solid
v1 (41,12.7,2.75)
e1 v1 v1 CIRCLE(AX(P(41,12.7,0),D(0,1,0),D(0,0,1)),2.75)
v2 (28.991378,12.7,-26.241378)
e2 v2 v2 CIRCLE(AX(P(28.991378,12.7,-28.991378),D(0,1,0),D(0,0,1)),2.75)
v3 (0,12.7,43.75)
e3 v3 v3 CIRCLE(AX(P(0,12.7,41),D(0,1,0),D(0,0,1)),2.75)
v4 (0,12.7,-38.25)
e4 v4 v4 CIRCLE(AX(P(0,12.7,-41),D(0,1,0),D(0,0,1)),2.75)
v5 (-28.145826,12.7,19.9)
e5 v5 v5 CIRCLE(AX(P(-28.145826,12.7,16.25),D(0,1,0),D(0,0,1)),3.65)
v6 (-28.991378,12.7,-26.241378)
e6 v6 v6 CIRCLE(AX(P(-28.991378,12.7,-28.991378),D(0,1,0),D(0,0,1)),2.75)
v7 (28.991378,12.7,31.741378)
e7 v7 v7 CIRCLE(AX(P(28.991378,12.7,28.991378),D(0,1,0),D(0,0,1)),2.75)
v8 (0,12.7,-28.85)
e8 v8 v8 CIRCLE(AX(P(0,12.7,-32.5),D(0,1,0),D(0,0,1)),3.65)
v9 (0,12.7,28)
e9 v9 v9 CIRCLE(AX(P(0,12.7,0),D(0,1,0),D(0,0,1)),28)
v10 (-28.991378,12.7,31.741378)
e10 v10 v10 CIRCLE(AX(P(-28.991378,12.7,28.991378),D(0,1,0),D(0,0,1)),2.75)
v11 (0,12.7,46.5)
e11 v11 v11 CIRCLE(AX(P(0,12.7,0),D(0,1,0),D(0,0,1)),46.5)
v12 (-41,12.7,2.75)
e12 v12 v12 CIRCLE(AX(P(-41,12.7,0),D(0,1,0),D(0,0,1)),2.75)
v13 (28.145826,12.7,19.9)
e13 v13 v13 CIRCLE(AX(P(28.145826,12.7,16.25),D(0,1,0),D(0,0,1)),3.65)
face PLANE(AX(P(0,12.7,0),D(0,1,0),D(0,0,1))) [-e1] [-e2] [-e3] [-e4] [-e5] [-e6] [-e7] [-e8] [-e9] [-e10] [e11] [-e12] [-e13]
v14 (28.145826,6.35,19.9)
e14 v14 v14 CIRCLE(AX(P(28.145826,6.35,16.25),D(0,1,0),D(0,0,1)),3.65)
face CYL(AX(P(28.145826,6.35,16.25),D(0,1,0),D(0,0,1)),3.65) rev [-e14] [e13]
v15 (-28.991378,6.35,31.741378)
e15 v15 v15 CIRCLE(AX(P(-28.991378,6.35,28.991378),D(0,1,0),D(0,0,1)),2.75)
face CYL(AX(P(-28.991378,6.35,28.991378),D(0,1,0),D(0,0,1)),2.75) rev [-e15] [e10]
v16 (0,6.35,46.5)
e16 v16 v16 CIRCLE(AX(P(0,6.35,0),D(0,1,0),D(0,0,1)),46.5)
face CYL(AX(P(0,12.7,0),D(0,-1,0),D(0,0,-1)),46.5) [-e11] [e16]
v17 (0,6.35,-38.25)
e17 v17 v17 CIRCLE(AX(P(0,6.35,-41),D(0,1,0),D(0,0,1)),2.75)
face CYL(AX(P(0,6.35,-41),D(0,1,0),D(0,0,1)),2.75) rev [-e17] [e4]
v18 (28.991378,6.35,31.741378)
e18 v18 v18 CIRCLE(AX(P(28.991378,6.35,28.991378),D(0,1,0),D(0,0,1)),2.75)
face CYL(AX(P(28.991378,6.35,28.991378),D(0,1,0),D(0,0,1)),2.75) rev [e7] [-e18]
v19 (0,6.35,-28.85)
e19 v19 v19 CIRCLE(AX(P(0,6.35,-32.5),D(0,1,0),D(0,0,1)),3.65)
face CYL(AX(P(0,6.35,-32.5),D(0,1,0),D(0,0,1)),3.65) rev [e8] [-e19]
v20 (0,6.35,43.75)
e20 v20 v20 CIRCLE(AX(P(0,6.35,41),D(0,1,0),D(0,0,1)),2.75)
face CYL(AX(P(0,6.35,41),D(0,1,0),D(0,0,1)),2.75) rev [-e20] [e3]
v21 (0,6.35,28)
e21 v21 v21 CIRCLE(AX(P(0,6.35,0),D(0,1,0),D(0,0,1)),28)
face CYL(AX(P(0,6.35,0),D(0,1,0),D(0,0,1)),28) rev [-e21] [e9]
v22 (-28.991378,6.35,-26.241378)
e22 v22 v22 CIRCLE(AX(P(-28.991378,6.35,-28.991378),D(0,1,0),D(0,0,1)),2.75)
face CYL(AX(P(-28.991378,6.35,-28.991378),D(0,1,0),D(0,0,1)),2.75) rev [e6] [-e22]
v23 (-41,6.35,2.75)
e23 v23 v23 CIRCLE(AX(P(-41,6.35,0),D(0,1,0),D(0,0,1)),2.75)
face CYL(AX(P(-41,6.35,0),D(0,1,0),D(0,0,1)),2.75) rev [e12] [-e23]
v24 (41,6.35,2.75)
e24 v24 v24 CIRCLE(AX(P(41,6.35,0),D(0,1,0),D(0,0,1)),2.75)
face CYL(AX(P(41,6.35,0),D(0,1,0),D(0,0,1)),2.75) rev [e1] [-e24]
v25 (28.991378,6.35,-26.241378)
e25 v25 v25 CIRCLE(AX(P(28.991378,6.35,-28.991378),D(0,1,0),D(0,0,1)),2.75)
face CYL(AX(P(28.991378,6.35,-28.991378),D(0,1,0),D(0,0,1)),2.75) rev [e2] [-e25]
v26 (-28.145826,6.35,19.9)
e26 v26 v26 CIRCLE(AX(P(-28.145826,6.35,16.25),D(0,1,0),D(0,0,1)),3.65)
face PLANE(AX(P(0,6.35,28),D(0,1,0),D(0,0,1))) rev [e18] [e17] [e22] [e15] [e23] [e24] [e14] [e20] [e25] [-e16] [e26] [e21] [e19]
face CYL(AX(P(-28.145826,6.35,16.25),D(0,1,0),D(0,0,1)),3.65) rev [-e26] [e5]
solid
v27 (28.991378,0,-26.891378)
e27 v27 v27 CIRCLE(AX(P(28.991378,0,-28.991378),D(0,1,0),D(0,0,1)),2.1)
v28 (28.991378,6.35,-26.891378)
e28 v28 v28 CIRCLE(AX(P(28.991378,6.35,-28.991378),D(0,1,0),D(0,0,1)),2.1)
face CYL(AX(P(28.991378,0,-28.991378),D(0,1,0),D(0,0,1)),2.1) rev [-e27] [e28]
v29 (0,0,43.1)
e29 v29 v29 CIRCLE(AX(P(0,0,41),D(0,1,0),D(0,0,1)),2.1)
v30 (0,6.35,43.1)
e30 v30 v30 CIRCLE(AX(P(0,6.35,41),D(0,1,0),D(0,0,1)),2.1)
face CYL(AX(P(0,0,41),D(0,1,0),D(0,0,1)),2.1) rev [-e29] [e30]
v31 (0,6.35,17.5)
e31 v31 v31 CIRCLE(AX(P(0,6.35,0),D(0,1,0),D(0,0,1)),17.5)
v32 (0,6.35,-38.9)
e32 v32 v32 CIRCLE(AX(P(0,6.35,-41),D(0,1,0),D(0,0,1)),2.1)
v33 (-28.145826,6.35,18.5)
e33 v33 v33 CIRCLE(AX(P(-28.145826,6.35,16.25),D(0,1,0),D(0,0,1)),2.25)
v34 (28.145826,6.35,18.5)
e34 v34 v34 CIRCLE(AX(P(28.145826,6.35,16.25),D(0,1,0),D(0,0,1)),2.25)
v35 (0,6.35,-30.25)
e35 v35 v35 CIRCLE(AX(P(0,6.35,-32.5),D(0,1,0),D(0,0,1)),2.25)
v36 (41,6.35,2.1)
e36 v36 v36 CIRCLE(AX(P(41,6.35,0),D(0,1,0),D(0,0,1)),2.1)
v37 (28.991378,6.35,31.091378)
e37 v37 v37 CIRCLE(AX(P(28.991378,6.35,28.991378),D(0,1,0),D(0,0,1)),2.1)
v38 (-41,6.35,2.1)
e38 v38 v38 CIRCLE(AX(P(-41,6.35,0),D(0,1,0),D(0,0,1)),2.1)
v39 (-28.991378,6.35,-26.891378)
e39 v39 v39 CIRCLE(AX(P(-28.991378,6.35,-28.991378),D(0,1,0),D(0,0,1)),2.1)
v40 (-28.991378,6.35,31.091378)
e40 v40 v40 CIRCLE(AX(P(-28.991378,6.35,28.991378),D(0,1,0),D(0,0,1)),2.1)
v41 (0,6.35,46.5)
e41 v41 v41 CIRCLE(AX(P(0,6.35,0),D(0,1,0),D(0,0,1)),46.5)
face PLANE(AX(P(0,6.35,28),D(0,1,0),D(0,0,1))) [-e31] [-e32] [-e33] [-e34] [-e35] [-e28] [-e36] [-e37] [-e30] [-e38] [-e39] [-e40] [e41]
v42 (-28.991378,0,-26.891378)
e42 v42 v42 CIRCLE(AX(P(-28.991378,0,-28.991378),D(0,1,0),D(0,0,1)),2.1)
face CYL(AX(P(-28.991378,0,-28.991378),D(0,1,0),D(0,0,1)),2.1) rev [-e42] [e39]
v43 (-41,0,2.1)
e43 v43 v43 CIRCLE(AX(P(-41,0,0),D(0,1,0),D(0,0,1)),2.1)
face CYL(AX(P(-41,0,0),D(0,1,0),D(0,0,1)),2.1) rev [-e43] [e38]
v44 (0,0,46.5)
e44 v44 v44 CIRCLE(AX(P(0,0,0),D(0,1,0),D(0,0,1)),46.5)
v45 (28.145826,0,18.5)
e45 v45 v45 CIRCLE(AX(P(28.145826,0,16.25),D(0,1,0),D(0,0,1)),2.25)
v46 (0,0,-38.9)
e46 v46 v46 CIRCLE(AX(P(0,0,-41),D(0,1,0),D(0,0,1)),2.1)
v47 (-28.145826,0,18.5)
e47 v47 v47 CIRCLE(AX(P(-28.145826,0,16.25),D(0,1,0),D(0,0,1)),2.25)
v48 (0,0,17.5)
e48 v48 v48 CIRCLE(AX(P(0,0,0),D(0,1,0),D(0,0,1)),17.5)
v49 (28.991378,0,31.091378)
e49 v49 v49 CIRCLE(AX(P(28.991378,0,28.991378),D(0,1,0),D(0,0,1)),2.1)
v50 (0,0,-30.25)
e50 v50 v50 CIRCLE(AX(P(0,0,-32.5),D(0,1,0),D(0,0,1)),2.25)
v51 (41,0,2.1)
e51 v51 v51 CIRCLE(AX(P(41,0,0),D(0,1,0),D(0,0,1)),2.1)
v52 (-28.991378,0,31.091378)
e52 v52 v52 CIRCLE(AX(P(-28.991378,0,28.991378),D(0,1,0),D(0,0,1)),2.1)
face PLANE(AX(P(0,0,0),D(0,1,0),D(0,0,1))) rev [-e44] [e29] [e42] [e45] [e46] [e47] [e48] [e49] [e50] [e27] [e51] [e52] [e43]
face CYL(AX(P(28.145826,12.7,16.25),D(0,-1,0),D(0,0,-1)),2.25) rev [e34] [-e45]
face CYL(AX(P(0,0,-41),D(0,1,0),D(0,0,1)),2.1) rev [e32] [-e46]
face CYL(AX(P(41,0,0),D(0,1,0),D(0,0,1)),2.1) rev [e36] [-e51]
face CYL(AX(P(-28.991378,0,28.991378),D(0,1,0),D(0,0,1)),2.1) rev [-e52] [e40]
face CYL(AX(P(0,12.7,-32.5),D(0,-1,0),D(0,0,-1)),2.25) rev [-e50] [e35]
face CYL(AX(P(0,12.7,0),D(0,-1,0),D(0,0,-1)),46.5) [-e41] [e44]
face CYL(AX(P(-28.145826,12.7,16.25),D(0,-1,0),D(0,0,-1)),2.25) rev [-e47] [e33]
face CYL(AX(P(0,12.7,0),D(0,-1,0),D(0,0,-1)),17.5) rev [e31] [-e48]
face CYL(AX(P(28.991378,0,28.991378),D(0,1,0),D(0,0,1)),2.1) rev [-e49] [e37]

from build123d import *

# Parameters (mm, degrees)
SKETCH1_R           = 46.5
SKETCH1_R_2         = 2.25
SKETCH1_R_3         = 17.5
BOSS_EXTRUDE1_DEPTH = 12.7
SKETCH2_R           = 28
CUT_EXTRUDE1_DEPTH  = 6.35
SKETCH3_R           = 2.75
CUT_EXTRUDE2_DEPTH  = 6.35
SKETCH4_R           = 3.65
CUT_EXTRUDE3_DEPTH  = 6.35
SKETCH5_R           = 2.1
CUT_EXTRUDE4_DEPTH  = 67.976040492


with BuildPart() as part:
    # Sketch1 → Boss-Extrude1 (new body)
    with BuildSketch(Plane(origin=(0, 0, 0), x_dir=(1, 0, 0), z_dir=(0, 1, 0))):
        Circle(SKETCH1_R)
        with Locations((0, 32.5)):
            Circle(SKETCH1_R_2, mode=Mode.SUBTRACT)
        with Locations((28.145825623, -16.25)):
            Circle(SKETCH1_R_2, mode=Mode.SUBTRACT)
        with Locations((-28.145825623, -16.25)):
            Circle(SKETCH1_R_2, mode=Mode.SUBTRACT)
        Circle(SKETCH1_R_3, mode=Mode.SUBTRACT)
    extrude(amount=BOSS_EXTRUDE1_DEPTH)

    # Sketch2 → Cut-Extrude1 (cut)
    with BuildSketch(Plane(origin=(0, 12.7, 0), x_dir=(1, 0, 0), z_dir=(0, 1, 0))):
        Circle(SKETCH2_R)
    extrude(amount=-CUT_EXTRUDE1_DEPTH, mode=Mode.SUBTRACT)

    # Sketch3 → Cut-Extrude2 (cut)
    with BuildSketch(Plane(origin=(0, 12.7, 0), x_dir=(1, 0, 0), z_dir=(0, 1, 0))):
        with Locations((0, 41)):
            Circle(SKETCH3_R)
        with Locations((28.991378029, 28.991378029)):
            Circle(SKETCH3_R)
        with Locations((41, 0)):
            Circle(SKETCH3_R)
        with Locations((28.991378029, -28.991378029)):
            Circle(SKETCH3_R)
        with Locations((0, -41)):
            Circle(SKETCH3_R)
        with Locations((-28.991378029, -28.991378029)):
            Circle(SKETCH3_R)
        with Locations((-41, 0)):
            Circle(SKETCH3_R)
        with Locations((-28.991378029, 28.991378029)):
            Circle(SKETCH3_R)
    extrude(amount=-CUT_EXTRUDE2_DEPTH, mode=Mode.SUBTRACT)

    # Sketch4 → Cut-Extrude3 (cut)
    with BuildSketch(Plane(origin=(0, 12.7, 0), x_dir=(1, 0, 0), z_dir=(0, 1, 0))):
        with Locations((0, 32.5)):
            Circle(SKETCH4_R)
        with Locations((28.145825623, -16.25)):
            Circle(SKETCH4_R)
        with Locations((-28.145825623, -16.25)):
            Circle(SKETCH4_R)
    extrude(amount=-CUT_EXTRUDE3_DEPTH, mode=Mode.SUBTRACT)


with BuildPart() as body_2:
    # Split1: the piece on the far side of the plane
    add(part.part)
    split(bisect_by=Plane.ZX.offset(6.35), keep=Keep.BOTTOM)

    # Sketch5 → Cut-Extrude4 (cut, through all)
    with BuildSketch(Plane(origin=(0, 12.7, 0), x_dir=(1, 0, 0), z_dir=(0, 1, 0))):
        with Locations((0, 41)):
            Circle(SKETCH5_R)
        with Locations((28.991378029, 28.991378029)):
            Circle(SKETCH5_R)
        with Locations((41, 0)):
            Circle(SKETCH5_R)
        with Locations((28.991378029, -28.991378029)):
            Circle(SKETCH5_R)
        with Locations((0, -41)):
            Circle(SKETCH5_R)
        with Locations((-28.991378029, -28.991378029)):
            Circle(SKETCH5_R)
        with Locations((-41, 0)):
            Circle(SKETCH5_R)
        with Locations((-28.991378029, 28.991378029)):
            Circle(SKETCH5_R)
    extrude(amount=-CUT_EXTRUDE4_DEPTH, mode=Mode.SUBTRACT)


with BuildPart() as part_1:
    add(part.part)

    # Split1
    split(bisect_by=Plane.ZX.offset(6.35), keep=Keep.TOP)


solid = Compound([body_2.part, part_1.part])
